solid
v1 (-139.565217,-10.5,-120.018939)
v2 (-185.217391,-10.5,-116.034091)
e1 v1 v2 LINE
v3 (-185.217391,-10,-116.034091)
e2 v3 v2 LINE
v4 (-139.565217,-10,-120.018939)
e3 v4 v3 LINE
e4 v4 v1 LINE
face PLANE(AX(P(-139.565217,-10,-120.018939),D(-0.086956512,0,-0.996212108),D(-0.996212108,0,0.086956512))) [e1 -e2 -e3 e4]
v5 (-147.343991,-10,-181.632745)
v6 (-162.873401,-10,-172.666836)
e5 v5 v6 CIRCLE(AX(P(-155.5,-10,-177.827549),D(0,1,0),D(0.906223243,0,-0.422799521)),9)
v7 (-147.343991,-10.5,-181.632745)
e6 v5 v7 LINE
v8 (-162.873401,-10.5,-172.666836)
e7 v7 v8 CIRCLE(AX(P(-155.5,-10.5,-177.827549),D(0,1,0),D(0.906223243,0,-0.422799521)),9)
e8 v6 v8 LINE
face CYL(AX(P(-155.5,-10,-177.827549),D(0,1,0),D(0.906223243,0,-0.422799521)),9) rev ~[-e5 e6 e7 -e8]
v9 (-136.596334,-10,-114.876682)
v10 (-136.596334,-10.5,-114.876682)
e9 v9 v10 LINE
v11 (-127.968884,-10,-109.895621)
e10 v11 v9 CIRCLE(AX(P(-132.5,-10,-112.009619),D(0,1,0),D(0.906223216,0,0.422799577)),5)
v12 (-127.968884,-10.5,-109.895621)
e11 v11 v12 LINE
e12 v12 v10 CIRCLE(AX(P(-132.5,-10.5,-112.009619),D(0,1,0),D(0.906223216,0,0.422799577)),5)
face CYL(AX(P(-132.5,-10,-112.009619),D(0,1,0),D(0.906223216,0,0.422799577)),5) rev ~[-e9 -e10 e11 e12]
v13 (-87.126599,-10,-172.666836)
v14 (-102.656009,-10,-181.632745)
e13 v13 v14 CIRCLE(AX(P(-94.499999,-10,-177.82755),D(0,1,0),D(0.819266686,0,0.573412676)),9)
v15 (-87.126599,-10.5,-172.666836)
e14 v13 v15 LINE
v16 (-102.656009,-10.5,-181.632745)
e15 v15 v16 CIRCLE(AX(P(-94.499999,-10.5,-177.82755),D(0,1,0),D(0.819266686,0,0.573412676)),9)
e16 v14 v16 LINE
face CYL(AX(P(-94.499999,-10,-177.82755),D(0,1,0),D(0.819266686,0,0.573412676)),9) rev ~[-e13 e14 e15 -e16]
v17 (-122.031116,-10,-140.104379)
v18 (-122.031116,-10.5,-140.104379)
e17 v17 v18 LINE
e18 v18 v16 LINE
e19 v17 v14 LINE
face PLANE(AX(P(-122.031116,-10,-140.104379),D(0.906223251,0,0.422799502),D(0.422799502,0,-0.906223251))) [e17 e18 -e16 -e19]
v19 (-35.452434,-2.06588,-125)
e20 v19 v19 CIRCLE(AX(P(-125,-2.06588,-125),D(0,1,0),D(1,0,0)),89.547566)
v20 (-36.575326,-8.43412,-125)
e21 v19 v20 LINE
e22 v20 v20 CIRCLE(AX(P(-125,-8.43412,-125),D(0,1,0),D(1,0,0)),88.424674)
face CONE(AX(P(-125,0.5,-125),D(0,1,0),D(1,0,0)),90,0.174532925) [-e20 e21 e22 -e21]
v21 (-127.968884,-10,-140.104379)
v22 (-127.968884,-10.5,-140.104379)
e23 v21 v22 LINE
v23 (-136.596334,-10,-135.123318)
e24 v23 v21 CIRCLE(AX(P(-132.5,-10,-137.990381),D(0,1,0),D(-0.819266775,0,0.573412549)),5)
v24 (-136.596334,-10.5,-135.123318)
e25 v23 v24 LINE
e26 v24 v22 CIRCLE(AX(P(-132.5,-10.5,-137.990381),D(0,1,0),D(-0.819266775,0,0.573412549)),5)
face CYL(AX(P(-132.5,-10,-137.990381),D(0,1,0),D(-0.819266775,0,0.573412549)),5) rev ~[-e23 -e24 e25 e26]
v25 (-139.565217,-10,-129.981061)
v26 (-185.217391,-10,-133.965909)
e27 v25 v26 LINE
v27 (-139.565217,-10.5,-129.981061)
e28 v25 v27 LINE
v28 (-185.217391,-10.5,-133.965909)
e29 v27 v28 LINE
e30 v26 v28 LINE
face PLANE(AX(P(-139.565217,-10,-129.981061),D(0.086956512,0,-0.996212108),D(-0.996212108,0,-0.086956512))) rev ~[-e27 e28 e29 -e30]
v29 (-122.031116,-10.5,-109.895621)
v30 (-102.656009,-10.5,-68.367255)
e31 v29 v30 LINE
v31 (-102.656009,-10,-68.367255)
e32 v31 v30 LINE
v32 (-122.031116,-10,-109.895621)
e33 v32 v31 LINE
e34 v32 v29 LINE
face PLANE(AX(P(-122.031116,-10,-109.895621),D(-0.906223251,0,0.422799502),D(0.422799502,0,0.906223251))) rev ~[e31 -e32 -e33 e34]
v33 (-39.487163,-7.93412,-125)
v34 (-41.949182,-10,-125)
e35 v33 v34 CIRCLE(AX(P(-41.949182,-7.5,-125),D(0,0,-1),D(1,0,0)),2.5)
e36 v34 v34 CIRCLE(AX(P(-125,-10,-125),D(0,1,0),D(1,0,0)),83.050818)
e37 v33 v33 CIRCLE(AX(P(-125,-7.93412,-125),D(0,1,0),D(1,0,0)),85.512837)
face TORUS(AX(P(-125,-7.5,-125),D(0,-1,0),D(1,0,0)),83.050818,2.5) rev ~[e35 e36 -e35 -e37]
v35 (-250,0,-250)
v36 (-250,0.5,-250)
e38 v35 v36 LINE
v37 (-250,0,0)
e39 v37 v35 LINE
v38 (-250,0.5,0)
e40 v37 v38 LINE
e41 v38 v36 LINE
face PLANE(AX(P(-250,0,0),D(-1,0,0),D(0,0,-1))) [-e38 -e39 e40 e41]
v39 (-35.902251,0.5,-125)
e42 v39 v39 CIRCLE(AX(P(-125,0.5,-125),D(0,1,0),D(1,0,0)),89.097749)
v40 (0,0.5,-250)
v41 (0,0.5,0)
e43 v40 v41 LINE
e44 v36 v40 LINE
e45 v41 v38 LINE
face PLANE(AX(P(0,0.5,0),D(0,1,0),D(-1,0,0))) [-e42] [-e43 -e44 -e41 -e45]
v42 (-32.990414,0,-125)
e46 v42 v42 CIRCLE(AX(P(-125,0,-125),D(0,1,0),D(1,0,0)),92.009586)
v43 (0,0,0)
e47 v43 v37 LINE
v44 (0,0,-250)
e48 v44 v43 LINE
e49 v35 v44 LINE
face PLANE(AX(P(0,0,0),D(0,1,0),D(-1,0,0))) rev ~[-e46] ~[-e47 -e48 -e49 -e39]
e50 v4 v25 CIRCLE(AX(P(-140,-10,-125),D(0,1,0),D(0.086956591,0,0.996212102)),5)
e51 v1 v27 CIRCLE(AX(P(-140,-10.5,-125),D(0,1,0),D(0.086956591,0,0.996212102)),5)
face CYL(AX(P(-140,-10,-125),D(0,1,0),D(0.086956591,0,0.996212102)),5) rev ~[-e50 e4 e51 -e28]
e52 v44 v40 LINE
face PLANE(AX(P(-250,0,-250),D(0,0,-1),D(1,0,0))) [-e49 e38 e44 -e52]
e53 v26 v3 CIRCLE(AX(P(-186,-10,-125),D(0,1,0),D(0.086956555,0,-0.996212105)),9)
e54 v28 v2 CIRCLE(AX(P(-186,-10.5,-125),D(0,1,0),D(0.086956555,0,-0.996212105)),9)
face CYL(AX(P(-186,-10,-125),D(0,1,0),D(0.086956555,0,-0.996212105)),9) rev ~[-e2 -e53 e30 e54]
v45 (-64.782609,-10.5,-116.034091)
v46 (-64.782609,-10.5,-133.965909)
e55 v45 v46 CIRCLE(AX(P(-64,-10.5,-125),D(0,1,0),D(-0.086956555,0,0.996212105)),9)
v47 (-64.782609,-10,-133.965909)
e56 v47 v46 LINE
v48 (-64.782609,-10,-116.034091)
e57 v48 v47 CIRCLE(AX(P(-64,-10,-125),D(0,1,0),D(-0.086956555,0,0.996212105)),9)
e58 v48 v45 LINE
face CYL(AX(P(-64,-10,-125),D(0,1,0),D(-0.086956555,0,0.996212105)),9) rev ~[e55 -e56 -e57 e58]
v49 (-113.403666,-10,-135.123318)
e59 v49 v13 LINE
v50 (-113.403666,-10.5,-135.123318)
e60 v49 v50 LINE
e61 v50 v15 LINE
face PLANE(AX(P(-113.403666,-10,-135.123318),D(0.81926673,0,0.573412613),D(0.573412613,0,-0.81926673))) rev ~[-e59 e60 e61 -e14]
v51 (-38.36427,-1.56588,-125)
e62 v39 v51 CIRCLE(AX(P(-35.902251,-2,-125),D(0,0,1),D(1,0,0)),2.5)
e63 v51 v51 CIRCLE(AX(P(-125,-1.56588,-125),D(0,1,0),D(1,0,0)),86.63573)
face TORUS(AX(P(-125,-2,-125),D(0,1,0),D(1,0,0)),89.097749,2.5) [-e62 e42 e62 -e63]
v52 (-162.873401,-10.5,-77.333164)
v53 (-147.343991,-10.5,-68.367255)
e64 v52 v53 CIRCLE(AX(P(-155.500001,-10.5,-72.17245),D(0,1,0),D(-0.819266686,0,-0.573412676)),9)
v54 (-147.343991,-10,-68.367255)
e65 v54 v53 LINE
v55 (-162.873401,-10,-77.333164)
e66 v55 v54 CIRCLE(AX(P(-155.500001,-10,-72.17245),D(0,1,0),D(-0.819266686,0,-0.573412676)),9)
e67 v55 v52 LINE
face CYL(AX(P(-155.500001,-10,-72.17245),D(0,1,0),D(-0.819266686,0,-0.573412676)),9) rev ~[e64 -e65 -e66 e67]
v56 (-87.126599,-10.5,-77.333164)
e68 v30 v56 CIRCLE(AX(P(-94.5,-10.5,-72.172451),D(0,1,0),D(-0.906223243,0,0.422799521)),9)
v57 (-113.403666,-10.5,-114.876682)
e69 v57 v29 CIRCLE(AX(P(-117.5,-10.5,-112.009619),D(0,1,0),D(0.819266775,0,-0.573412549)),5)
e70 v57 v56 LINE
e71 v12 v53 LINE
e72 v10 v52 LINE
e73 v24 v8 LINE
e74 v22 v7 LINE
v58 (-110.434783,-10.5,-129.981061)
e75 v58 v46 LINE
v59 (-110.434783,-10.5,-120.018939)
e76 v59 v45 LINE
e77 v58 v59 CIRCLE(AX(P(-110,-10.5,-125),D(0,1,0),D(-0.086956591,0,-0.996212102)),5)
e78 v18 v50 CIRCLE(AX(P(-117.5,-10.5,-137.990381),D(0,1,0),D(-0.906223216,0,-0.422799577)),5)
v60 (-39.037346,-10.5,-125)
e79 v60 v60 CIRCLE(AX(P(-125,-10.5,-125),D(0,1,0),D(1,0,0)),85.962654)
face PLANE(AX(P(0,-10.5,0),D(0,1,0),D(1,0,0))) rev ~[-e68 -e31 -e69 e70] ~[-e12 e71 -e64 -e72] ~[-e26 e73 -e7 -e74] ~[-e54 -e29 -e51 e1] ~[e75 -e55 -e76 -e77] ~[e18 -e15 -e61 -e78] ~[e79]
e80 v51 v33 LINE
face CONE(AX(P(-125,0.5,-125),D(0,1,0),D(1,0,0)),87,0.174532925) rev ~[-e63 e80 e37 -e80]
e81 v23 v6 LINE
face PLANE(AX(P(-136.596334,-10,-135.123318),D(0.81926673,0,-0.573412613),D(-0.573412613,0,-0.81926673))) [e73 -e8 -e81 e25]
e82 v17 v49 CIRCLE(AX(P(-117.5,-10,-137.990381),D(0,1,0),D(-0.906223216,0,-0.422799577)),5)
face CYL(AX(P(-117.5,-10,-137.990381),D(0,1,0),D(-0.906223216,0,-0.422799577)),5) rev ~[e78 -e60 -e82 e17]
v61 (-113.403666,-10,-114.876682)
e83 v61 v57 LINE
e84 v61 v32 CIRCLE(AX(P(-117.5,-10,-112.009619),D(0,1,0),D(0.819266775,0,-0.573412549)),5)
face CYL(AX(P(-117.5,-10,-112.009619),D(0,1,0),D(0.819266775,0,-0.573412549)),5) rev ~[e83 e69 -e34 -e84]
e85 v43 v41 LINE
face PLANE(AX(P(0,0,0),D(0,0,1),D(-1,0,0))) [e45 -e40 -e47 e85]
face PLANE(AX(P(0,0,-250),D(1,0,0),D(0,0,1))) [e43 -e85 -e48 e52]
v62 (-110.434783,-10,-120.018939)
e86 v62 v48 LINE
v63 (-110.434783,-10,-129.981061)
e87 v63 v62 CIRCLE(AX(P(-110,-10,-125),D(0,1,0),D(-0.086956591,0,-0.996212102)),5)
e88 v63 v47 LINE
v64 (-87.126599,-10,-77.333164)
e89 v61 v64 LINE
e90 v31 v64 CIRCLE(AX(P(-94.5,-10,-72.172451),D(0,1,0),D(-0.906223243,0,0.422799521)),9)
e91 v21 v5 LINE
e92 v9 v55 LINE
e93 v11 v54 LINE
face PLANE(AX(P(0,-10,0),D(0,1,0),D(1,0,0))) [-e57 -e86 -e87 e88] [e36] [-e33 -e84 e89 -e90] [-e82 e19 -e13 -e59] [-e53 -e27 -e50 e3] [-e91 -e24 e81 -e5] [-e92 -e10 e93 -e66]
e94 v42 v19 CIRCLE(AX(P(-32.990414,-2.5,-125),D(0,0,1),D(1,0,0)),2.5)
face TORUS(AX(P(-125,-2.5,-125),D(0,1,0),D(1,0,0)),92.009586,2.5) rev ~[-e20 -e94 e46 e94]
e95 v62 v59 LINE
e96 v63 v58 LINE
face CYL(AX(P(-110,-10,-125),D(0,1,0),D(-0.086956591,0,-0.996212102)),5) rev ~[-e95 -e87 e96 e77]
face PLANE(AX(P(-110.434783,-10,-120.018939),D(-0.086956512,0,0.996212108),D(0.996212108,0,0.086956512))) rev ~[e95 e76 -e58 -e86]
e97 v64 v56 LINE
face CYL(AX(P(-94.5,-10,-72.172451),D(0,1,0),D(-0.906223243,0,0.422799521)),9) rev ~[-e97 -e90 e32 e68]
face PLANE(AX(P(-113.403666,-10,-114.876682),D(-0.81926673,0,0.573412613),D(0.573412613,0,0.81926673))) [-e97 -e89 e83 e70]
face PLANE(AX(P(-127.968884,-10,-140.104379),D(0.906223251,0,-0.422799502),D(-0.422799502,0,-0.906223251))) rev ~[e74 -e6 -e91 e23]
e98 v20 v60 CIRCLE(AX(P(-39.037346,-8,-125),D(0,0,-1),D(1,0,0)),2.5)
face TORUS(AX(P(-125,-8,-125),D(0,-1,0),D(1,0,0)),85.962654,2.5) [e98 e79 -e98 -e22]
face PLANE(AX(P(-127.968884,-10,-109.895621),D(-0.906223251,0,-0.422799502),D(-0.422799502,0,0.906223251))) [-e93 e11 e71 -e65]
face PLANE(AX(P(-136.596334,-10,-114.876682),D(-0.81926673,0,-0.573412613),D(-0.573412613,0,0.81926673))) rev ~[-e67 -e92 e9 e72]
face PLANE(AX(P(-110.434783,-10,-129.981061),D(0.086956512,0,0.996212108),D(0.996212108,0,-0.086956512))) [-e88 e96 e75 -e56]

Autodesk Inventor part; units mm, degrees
ref_plane "YZ Plane" through (0, 0, 0) normal (1, 0, 0) x (0, 1, 0)
ref_plane "XZ Plane" through (0, 0, 0) normal (0, 1, 0) x (-1, 0, 0)
sketch "Sketch1" plane through (0, 0, 0) normal (0, 1, 0) x (-1, 0, 0)
  line L0 (0, 0) -> (250, 0)
  line L1 (250, 0) -> (250, -250)
  line L2 (250, -250) -> (0, -250)
  line L3 (0, -250) -> (0, 0)
  dimension "d0" = 250
  dimension "d1" = 250
extrude "Plate1" add sketch "Sketch1" along normal blind 0.5
sketch "Sketch2" plane through (0, 0.5, 0) normal (0, 1, 0) x (1, 0, 0)
  line L0 (0, 0) -> (-250, 0) construction
  line L1 (0, 250) -> (0, 0) construction
  circle A0 centre (-125, 125) radius 90
  line L2 (-125, 125) -> (-215, 125) construction
  line L3 (-125, 125) -> (-125, 35) construction
  circle A1 centre (-125, 125) radius 87
  dimension "d3" = 125
  dimension "d4" = 125
  dimension "d5" = 180
  dimension "d29" = 3
sketch "Sketch2 outline for Extrusion5" plane through (0, 0.5, 0) normal (0, 1, 0) x (1, 0, 0)
  circle A0 centre (-125, 125) radius 90
extrude "Extrusion5" add sketch "Sketch2 outline for Extrusion5" against normal blind 11 draft -10
extrude "Extrusion6" cut sketch "Sketch2" against normal blind 10.5 draft -10 contours A1
fillet "Fillet1" radius 2.5 4 edges at (-212, 0.5, -125) (-214.9118, 0, -125) (-213.0604, -10.5, -125) (-210.1486, -10, -125)
ref_plane "Work Plane6" through (-125, -10, -125) normal (0, 1, 0) x (-1, 0, 0)
ref_plane "Work Plane5" through (-125, 0.5, -125) normal (0, 1, 0) x (-1, 0, 0)
sketch "Sketch6" plane through (-125, -10, -125) normal (0, 1, 0) x (-1, 0, 0)
  line L0 (0, 0) -> (90, 0) construction
  line L1 (0, 0) -> (0, 90) construction
  arc A0 (60.217391, -8.965909) -> (60.217391, 8.965909) centre (61, 0) ccw
  arc A1 (14.565217, 4.981061) -> (14.565217, -4.981061) centre (15, 0) ccw
  line L2 (14.565217, -4.981061) -> (60.217391, -8.965909)
  line L3 (14.565217, 4.981061) -> (60.217391, 8.965909)
  line L4 (10, 0) -> (70, 0) construction
  arc A2 (2.968884, 15.104379) -> (11.596334, 10.123318) centre (7.5, 12.990381) ccw
  line L5 (2.968884, 15.104379) -> (22.343991, 56.632745)
  line L6 (5, 8.660254) -> (35, 60.621778) construction
  line L7 (11.596334, 10.123318) -> (37.873401, 47.666836)
  arc A3 (37.873401, 47.666836) -> (22.343991, 56.632745) centre (30.5, 52.82755) ccw
  arc A4 (-11.596334, 10.123318) -> (-2.968884, 15.104379) centre (-7.5, 12.990381) ccw
  line L8 (-11.596334, 10.123318) -> (-37.873401, 47.666836)
  line L9 (-5, 8.660254) -> (-35, 60.621778) construction
  line L10 (-2.968884, 15.104379) -> (-22.343991, 56.632745)
  arc A5 (-22.343991, 56.632745) -> (-37.873401, 47.666836) centre (-30.5, 52.82755) ccw
  arc A6 (-14.565217, -4.981061) -> (-14.565217, 4.981061) centre (-15, 0) ccw
  line L11 (-14.565217, -4.981061) -> (-60.217391, -8.965909)
  line L12 (-10, 0) -> (-70, 0) construction
  line L13 (-14.565217, 4.981061) -> (-60.217391, 8.965909)
  arc A7 (-60.217391, 8.965909) -> (-60.217391, -8.965909) centre (-61, 0) ccw
  arc A8 (-2.968884, -15.104379) -> (-11.596334, -10.123318) centre (-7.5, -12.990381) ccw
  line L14 (-2.968884, -15.104379) -> (-22.343991, -56.632745)
  line L15 (-5, -8.660254) -> (-35, -60.621778) construction
  line L16 (-11.596334, -10.123318) -> (-37.873401, -47.666836)
  arc A9 (-37.873401, -47.666836) -> (-22.343991, -56.632745) centre (-30.5, -52.82755) ccw
  arc A10 (11.596334, -10.123318) -> (2.968884, -15.104379) centre (7.5, -12.990381) ccw
  line L17 (11.596334, -10.123318) -> (37.873401, -47.666836)
  line L18 (5, -8.660254) -> (35, -60.621778) construction
  line L19 (2.968884, -15.104379) -> (22.343991, -56.632745)
  arc A11 (22.343991, -56.632745) -> (37.873401, -47.666836) centre (30.5, -52.82755) ccw
  point P0 (-125, 125)
  dimension "d38" = 5
  dimension "d39" = 9
  dimension "d40" = 15
  dimension "d41" = 60
  dimension "d42" = 360
extrude "Extrusion7" cut sketch "Sketch6" against normal blind 0.5
equation "\"d32\" = Profile - Thickness"
equation "\"d34\" = 5 * Thickness"
equation "\"d43\" = Thickness"
equation "\"d2\" = Thickness"
equation "\"BendRadius\" = Thickness"
equation "\"BendReliefWidth\" = Thickness"
equation "\"BendReliefDepth\" = 0.5 * Thickness"
equation "\"CornerReliefSize\" = 4 * Thickness"
equation "\"MinimumRemnant\" = 2 * Thickness"
equation "\"TransitionRadius\" = BendRadius"
equation "\"JacobiRadiusSize\" = BendRadius"
equation "\"GapSize\" = Thickness"
equation "\"Profile\" = 11"
equation "\"Thickness\" = 0.5"
properties part number "A2.2-big-punch-3"
